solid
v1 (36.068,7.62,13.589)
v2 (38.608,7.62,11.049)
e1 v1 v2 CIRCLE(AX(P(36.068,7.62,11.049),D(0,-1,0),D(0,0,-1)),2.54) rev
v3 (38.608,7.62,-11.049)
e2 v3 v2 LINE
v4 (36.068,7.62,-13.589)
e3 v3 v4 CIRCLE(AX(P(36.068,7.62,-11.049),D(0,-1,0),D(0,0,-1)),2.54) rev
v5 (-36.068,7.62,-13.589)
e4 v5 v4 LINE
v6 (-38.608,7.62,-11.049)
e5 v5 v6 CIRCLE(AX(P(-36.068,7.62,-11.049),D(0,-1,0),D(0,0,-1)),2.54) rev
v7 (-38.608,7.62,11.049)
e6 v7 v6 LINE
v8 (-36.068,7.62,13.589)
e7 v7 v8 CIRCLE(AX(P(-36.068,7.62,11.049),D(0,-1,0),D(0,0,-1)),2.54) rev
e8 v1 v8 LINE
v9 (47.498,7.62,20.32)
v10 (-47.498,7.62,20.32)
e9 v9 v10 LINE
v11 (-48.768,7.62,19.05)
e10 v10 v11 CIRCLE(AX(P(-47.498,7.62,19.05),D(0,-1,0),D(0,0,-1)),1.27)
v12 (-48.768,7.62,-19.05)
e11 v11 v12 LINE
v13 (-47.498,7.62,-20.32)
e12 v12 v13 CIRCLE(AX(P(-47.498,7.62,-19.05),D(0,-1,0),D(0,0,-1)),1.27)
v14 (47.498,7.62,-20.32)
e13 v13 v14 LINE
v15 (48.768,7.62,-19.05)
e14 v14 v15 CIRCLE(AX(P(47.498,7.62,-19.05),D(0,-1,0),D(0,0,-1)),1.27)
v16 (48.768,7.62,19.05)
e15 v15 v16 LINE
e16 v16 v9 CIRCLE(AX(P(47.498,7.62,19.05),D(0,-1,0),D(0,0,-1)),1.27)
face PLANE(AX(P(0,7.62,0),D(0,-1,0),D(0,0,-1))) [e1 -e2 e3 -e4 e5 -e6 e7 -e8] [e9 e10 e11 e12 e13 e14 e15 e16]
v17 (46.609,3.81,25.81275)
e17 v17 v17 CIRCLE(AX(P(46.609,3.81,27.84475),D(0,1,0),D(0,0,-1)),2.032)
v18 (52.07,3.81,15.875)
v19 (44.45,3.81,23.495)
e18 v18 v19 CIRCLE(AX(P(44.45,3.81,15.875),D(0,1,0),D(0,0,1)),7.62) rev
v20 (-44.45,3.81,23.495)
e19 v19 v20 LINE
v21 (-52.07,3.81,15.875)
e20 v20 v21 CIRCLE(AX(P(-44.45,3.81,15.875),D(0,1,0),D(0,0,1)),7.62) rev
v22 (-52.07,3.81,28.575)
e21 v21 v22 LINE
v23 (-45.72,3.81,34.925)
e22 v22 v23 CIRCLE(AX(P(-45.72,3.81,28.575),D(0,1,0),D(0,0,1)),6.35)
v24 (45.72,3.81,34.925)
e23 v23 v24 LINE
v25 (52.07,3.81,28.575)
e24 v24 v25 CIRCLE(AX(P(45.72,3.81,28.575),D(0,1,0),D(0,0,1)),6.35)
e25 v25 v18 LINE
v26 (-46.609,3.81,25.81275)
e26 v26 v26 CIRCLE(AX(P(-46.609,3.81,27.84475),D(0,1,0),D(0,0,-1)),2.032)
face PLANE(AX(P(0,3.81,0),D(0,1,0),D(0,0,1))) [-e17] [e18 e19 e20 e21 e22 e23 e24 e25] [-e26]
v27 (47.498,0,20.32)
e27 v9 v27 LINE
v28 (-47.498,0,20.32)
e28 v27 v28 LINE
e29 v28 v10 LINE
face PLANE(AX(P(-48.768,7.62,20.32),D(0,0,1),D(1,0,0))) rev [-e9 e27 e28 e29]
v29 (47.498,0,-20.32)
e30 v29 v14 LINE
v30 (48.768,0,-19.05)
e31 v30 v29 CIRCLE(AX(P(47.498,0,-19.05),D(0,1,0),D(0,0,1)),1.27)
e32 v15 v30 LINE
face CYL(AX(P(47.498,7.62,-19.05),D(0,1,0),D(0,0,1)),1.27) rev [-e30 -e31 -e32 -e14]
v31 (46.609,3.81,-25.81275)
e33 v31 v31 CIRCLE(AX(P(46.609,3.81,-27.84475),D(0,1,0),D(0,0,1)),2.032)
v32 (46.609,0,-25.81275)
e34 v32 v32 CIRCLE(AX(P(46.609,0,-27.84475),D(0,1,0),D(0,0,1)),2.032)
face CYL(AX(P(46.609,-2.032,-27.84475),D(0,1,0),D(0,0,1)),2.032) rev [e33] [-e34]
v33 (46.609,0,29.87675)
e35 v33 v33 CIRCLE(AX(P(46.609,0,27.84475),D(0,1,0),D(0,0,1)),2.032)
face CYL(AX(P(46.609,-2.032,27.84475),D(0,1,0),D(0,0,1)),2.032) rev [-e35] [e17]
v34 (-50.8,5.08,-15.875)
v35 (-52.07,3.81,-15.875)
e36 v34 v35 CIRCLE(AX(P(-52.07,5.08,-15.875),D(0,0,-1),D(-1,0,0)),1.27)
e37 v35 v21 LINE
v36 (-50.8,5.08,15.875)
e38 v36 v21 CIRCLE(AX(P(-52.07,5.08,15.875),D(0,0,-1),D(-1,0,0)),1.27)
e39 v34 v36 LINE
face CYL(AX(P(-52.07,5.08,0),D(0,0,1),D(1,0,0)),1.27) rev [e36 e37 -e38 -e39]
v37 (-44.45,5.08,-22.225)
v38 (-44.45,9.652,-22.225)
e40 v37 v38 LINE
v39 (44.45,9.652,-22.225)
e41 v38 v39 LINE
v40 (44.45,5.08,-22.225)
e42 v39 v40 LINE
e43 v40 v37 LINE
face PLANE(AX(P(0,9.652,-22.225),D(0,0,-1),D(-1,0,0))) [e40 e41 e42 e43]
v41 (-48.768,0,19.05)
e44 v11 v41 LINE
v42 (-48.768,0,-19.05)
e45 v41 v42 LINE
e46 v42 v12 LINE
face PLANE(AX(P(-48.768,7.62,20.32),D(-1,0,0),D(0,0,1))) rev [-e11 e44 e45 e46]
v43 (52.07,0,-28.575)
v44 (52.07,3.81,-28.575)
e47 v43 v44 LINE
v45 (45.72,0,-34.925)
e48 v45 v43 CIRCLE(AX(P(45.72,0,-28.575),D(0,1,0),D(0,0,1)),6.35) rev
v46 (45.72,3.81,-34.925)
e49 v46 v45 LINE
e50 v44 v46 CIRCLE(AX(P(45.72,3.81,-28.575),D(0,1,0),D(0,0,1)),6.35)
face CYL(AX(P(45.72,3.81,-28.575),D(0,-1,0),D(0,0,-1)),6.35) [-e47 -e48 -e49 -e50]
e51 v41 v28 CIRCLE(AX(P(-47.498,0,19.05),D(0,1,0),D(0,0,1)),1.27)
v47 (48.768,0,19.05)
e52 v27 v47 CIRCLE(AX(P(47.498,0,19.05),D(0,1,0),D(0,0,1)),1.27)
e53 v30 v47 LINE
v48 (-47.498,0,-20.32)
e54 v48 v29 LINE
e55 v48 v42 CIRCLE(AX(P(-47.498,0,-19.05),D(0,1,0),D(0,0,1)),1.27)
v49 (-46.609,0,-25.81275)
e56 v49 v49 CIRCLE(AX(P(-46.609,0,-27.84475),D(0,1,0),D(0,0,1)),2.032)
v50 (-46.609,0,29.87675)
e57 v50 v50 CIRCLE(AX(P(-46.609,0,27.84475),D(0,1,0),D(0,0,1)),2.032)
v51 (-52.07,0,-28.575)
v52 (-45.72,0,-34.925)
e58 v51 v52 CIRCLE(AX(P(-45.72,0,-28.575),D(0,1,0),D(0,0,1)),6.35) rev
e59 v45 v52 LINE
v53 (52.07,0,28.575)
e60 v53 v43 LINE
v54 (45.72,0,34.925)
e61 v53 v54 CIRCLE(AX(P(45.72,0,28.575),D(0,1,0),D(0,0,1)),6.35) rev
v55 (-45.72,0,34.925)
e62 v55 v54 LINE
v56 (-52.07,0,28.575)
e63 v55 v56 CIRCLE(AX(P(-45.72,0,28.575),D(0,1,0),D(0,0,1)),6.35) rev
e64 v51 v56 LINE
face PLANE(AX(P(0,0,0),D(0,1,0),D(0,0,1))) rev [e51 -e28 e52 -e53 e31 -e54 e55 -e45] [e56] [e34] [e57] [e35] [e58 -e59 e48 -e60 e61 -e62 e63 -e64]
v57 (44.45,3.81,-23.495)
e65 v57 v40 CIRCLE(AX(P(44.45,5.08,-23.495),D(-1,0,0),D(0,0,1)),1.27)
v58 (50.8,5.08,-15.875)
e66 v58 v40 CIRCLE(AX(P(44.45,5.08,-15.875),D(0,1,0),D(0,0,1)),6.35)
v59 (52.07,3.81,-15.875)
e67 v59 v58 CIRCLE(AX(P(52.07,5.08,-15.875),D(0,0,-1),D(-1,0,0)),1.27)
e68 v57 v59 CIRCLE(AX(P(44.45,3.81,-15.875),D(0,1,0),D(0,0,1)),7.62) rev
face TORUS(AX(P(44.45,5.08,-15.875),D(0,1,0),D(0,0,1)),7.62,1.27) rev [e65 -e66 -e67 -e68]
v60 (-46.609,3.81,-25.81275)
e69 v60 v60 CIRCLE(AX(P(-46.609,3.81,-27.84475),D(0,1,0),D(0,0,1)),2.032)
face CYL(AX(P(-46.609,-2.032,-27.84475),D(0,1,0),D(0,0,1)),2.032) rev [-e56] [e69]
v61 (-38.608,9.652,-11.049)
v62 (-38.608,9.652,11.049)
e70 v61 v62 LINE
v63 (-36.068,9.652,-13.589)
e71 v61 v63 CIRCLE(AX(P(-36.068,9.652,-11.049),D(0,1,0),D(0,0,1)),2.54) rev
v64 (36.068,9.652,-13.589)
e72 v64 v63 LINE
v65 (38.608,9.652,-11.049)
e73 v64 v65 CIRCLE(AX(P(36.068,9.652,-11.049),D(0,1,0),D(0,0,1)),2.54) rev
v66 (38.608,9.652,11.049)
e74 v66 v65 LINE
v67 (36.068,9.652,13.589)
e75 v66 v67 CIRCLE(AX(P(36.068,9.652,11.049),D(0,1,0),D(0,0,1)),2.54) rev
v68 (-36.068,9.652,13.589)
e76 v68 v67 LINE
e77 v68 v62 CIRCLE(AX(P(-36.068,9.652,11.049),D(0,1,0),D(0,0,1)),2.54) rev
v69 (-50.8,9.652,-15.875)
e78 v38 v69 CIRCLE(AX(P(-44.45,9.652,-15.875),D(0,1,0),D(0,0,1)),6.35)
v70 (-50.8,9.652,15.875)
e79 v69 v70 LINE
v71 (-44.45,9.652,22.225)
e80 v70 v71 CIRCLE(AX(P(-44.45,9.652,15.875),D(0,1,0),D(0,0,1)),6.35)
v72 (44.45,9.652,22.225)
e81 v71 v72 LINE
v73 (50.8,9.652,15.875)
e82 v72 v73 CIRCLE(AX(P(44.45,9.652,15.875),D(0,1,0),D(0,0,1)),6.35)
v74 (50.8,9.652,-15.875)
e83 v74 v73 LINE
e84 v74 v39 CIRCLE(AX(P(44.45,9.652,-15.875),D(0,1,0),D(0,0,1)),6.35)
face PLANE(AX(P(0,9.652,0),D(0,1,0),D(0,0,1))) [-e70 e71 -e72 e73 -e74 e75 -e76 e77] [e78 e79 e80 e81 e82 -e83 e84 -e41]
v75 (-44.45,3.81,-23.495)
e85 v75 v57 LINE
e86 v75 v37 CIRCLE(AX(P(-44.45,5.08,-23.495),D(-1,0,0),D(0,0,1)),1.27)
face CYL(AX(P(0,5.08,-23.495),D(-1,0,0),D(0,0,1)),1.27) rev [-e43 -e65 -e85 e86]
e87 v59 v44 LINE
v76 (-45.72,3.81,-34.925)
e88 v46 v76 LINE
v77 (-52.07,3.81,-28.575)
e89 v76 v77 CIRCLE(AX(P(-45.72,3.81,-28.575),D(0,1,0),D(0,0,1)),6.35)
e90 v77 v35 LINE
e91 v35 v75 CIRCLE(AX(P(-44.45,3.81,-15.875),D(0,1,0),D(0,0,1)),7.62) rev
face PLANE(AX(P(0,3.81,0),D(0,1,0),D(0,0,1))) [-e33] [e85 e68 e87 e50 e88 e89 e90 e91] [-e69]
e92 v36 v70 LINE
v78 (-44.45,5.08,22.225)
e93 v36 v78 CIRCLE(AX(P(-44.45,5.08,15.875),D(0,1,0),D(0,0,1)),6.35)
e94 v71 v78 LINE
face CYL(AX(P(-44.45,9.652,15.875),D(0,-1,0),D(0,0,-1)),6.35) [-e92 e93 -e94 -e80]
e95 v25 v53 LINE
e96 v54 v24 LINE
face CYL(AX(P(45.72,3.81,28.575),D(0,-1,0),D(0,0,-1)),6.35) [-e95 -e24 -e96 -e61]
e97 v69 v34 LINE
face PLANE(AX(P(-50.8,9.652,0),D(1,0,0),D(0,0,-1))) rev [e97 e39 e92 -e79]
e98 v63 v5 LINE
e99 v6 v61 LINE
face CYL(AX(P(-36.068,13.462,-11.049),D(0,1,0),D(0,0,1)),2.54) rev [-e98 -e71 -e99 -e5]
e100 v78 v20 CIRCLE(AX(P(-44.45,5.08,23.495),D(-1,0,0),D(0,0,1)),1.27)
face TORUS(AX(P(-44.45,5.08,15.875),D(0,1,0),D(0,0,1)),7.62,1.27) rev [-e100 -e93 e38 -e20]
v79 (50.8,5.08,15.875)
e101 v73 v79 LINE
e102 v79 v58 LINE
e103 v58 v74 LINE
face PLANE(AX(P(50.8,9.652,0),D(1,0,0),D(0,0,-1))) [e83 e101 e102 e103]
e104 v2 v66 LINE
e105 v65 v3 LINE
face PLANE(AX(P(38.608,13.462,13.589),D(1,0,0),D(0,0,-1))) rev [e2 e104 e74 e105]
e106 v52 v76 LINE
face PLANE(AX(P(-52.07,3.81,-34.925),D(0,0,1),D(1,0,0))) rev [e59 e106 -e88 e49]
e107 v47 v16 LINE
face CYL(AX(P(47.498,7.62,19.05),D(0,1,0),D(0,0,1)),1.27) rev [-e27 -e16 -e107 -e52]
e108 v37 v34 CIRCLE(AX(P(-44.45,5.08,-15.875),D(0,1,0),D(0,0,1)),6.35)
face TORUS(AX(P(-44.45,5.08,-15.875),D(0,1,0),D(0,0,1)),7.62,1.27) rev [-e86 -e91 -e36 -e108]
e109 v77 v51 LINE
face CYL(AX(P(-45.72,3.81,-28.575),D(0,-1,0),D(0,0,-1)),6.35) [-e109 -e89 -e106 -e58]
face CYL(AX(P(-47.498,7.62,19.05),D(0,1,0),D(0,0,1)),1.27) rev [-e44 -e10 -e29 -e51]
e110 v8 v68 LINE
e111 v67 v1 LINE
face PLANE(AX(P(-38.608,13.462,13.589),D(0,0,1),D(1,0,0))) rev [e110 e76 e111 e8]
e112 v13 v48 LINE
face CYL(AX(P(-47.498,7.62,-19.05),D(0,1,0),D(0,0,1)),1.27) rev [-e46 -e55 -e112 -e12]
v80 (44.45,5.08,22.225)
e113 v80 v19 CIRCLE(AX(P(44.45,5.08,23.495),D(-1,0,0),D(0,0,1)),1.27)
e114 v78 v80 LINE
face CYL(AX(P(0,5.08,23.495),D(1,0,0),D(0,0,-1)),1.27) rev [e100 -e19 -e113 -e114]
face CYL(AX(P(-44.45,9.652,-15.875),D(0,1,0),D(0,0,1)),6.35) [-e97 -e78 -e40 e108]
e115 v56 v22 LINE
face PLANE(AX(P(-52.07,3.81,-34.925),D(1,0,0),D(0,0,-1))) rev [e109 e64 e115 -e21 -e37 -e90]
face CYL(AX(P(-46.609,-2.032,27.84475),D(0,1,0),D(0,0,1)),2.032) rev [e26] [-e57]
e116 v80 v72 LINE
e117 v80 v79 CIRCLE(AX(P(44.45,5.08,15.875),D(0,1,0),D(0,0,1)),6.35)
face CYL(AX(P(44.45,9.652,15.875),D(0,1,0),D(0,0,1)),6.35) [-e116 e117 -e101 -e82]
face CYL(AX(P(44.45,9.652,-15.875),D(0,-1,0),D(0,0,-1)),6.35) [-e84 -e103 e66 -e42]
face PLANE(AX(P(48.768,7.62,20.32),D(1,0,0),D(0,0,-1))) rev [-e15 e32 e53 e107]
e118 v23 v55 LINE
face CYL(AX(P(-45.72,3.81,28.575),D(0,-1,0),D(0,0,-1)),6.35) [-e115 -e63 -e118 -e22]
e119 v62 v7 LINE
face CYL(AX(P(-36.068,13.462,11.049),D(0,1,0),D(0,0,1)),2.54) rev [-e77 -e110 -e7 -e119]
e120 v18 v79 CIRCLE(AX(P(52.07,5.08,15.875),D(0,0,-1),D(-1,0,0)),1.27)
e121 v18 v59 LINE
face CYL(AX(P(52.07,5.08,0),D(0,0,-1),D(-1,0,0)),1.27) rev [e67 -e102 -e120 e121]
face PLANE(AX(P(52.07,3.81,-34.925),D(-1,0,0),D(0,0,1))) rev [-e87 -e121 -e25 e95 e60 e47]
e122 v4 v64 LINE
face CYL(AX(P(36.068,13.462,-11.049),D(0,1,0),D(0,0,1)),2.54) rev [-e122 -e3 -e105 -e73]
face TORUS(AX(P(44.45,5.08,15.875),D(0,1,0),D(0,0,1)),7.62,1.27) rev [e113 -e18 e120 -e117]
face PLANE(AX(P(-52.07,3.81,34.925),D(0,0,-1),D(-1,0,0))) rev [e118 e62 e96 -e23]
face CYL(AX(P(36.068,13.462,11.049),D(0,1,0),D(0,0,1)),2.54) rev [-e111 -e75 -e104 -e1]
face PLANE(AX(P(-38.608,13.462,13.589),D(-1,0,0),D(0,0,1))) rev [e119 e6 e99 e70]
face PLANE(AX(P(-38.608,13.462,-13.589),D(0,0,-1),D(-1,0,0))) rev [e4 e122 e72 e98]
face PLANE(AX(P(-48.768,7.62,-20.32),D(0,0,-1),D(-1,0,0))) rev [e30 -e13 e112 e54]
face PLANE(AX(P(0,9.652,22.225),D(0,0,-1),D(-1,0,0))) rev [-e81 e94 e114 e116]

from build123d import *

# Parameters (mm, degrees)
SKETCH1_W           = 104.14
SKETCH1_H           = 69.85
BOSS_EXTRUDE1_DEPTH = 3.81
SKETCH2_W           = 101.6
SKETCH2_H           = 44.45
BOSS_EXTRUDE2_DEPTH = 5.842
SKETCH4_W           = 97.536
SKETCH4_H           = 40.64
CUT_EXTRUDE1_DEPTH  = 7.62
SKETCH5_W           = 77.216
SKETCH5_H           = 27.178
CUT_EXTRUDE2_DEPTH  = 5.842
FILLET1_R           = 2.54
FILLET2_R           = 6.35
FILLET3_R           = 1.27
SKETCH6_R           = 2.032
CUT_EXTRUDE3_DEPTH  = 5.842
FILLET4_R           = 1.27


with BuildPart() as part:
    # Sketch1 → Boss-Extrude1 (new body)
    with BuildSketch(Plane(origin=(0, 0, 0), x_dir=(1, 0, 0), z_dir=(0, 1, 0))):
        Rectangle(SKETCH1_W, SKETCH1_H)
    extrude(amount=BOSS_EXTRUDE1_DEPTH)

    # Sketch2 → Boss-Extrude2 (add)
    with BuildSketch(Plane(origin=(0, 3.81, 0), x_dir=(1, 0, 0), z_dir=(0, 1, 0))):
        Rectangle(SKETCH2_W, SKETCH2_H)
    extrude(amount=BOSS_EXTRUDE2_DEPTH)

    # Sketch4 → Cut-Extrude1 (cut)
    with BuildSketch(Plane.XZ):
        Rectangle(SKETCH4_W, SKETCH4_H)
    extrude(amount=-CUT_EXTRUDE1_DEPTH, mode=Mode.SUBTRACT)

    # Sketch5 → Cut-Extrude2 (cut)
    with BuildSketch(Plane.XZ.offset(-7.62)):
        Rectangle(SKETCH5_W, SKETCH5_H)
    extrude(amount=-CUT_EXTRUDE2_DEPTH, mode=Mode.SUBTRACT)

    # Fillet1
    fillet1_edges = [part.edges().sort_by_distance(p)[0] for p in [
        (-38.608, 8.636, -13.589),
        (-38.608, 8.636, 13.589),
        (38.608, 8.636, 13.589),
        (38.608, 8.636, -13.589),
    ]]
    fillet(fillet1_edges, radius=FILLET1_R)

    # Fillet2
    fillet2_edges = [part.edges().sort_by_distance(p)[0] for p in [
        (50.8, 6.731, 22.225),
        (50.8, 6.731, -22.225),
        (-50.8, 6.731, -22.225),
        (-50.8, 6.731, 22.225),
        (-52.07, 1.905, -34.925),
        (52.07, 1.905, -34.925),
        (52.07, 1.905, 34.925),
        (-52.07, 1.905, 34.925),
    ]]
    fillet(fillet2_edges, radius=FILLET2_R)

    # Fillet3
    fillet3_edges = [part.edges().sort_by_distance(p)[0] for p in [
        (0, 3.81, -22.225),
        (50.8, 3.81, 0),
        (0, 3.81, 22.225),
        (-50.8, 3.81, 0),
        (48.940128061, 3.81, -20.365128061),
        (-48.940128061, 3.81, -20.365128061),
        (-48.940128061, 3.81, 20.365128061),
        (48.940128061, 3.81, 20.365128061),
    ]]
    fillet(fillet3_edges, radius=FILLET3_R - 0.0001)  # a hair under: the kernel refuses the full size

    # Sketch6 → Cut-Extrude3 (cut)
    with BuildSketch(Plane(origin=(0, 3.81, 0), x_dir=(1, 0, 0), z_dir=(0, 1, 0))):
        with Locations(Location((-46.609, 27.84475, 0), (0, 0, 270))):
            Circle(SKETCH6_R)
        with Locations(Location((46.609, 27.84475, 0), (0, 0, 270))):
            Circle(SKETCH6_R)
        with Locations(Location((46.609, -27.84475, 0), (0, 0, 270))):
            Circle(SKETCH6_R)
        with Locations(Location((-46.609, -27.84475, 0), (0, 0, 270))):
            Circle(SKETCH6_R)
    extrude(amount=-CUT_EXTRUDE3_DEPTH, mode=Mode.SUBTRACT)

    # Fillet4
    fillet4_edges = [part.edges().sort_by_distance(p)[0] for p in [
        (-48.768, 3.81, -20.32),
        (-48.768, 3.81, 20.32),
        (48.768, 3.81, 20.32),
        (48.768, 3.81, -20.32),
    ]]
    fillet(fillet4_edges, radius=FILLET4_R)


solid = part.part
